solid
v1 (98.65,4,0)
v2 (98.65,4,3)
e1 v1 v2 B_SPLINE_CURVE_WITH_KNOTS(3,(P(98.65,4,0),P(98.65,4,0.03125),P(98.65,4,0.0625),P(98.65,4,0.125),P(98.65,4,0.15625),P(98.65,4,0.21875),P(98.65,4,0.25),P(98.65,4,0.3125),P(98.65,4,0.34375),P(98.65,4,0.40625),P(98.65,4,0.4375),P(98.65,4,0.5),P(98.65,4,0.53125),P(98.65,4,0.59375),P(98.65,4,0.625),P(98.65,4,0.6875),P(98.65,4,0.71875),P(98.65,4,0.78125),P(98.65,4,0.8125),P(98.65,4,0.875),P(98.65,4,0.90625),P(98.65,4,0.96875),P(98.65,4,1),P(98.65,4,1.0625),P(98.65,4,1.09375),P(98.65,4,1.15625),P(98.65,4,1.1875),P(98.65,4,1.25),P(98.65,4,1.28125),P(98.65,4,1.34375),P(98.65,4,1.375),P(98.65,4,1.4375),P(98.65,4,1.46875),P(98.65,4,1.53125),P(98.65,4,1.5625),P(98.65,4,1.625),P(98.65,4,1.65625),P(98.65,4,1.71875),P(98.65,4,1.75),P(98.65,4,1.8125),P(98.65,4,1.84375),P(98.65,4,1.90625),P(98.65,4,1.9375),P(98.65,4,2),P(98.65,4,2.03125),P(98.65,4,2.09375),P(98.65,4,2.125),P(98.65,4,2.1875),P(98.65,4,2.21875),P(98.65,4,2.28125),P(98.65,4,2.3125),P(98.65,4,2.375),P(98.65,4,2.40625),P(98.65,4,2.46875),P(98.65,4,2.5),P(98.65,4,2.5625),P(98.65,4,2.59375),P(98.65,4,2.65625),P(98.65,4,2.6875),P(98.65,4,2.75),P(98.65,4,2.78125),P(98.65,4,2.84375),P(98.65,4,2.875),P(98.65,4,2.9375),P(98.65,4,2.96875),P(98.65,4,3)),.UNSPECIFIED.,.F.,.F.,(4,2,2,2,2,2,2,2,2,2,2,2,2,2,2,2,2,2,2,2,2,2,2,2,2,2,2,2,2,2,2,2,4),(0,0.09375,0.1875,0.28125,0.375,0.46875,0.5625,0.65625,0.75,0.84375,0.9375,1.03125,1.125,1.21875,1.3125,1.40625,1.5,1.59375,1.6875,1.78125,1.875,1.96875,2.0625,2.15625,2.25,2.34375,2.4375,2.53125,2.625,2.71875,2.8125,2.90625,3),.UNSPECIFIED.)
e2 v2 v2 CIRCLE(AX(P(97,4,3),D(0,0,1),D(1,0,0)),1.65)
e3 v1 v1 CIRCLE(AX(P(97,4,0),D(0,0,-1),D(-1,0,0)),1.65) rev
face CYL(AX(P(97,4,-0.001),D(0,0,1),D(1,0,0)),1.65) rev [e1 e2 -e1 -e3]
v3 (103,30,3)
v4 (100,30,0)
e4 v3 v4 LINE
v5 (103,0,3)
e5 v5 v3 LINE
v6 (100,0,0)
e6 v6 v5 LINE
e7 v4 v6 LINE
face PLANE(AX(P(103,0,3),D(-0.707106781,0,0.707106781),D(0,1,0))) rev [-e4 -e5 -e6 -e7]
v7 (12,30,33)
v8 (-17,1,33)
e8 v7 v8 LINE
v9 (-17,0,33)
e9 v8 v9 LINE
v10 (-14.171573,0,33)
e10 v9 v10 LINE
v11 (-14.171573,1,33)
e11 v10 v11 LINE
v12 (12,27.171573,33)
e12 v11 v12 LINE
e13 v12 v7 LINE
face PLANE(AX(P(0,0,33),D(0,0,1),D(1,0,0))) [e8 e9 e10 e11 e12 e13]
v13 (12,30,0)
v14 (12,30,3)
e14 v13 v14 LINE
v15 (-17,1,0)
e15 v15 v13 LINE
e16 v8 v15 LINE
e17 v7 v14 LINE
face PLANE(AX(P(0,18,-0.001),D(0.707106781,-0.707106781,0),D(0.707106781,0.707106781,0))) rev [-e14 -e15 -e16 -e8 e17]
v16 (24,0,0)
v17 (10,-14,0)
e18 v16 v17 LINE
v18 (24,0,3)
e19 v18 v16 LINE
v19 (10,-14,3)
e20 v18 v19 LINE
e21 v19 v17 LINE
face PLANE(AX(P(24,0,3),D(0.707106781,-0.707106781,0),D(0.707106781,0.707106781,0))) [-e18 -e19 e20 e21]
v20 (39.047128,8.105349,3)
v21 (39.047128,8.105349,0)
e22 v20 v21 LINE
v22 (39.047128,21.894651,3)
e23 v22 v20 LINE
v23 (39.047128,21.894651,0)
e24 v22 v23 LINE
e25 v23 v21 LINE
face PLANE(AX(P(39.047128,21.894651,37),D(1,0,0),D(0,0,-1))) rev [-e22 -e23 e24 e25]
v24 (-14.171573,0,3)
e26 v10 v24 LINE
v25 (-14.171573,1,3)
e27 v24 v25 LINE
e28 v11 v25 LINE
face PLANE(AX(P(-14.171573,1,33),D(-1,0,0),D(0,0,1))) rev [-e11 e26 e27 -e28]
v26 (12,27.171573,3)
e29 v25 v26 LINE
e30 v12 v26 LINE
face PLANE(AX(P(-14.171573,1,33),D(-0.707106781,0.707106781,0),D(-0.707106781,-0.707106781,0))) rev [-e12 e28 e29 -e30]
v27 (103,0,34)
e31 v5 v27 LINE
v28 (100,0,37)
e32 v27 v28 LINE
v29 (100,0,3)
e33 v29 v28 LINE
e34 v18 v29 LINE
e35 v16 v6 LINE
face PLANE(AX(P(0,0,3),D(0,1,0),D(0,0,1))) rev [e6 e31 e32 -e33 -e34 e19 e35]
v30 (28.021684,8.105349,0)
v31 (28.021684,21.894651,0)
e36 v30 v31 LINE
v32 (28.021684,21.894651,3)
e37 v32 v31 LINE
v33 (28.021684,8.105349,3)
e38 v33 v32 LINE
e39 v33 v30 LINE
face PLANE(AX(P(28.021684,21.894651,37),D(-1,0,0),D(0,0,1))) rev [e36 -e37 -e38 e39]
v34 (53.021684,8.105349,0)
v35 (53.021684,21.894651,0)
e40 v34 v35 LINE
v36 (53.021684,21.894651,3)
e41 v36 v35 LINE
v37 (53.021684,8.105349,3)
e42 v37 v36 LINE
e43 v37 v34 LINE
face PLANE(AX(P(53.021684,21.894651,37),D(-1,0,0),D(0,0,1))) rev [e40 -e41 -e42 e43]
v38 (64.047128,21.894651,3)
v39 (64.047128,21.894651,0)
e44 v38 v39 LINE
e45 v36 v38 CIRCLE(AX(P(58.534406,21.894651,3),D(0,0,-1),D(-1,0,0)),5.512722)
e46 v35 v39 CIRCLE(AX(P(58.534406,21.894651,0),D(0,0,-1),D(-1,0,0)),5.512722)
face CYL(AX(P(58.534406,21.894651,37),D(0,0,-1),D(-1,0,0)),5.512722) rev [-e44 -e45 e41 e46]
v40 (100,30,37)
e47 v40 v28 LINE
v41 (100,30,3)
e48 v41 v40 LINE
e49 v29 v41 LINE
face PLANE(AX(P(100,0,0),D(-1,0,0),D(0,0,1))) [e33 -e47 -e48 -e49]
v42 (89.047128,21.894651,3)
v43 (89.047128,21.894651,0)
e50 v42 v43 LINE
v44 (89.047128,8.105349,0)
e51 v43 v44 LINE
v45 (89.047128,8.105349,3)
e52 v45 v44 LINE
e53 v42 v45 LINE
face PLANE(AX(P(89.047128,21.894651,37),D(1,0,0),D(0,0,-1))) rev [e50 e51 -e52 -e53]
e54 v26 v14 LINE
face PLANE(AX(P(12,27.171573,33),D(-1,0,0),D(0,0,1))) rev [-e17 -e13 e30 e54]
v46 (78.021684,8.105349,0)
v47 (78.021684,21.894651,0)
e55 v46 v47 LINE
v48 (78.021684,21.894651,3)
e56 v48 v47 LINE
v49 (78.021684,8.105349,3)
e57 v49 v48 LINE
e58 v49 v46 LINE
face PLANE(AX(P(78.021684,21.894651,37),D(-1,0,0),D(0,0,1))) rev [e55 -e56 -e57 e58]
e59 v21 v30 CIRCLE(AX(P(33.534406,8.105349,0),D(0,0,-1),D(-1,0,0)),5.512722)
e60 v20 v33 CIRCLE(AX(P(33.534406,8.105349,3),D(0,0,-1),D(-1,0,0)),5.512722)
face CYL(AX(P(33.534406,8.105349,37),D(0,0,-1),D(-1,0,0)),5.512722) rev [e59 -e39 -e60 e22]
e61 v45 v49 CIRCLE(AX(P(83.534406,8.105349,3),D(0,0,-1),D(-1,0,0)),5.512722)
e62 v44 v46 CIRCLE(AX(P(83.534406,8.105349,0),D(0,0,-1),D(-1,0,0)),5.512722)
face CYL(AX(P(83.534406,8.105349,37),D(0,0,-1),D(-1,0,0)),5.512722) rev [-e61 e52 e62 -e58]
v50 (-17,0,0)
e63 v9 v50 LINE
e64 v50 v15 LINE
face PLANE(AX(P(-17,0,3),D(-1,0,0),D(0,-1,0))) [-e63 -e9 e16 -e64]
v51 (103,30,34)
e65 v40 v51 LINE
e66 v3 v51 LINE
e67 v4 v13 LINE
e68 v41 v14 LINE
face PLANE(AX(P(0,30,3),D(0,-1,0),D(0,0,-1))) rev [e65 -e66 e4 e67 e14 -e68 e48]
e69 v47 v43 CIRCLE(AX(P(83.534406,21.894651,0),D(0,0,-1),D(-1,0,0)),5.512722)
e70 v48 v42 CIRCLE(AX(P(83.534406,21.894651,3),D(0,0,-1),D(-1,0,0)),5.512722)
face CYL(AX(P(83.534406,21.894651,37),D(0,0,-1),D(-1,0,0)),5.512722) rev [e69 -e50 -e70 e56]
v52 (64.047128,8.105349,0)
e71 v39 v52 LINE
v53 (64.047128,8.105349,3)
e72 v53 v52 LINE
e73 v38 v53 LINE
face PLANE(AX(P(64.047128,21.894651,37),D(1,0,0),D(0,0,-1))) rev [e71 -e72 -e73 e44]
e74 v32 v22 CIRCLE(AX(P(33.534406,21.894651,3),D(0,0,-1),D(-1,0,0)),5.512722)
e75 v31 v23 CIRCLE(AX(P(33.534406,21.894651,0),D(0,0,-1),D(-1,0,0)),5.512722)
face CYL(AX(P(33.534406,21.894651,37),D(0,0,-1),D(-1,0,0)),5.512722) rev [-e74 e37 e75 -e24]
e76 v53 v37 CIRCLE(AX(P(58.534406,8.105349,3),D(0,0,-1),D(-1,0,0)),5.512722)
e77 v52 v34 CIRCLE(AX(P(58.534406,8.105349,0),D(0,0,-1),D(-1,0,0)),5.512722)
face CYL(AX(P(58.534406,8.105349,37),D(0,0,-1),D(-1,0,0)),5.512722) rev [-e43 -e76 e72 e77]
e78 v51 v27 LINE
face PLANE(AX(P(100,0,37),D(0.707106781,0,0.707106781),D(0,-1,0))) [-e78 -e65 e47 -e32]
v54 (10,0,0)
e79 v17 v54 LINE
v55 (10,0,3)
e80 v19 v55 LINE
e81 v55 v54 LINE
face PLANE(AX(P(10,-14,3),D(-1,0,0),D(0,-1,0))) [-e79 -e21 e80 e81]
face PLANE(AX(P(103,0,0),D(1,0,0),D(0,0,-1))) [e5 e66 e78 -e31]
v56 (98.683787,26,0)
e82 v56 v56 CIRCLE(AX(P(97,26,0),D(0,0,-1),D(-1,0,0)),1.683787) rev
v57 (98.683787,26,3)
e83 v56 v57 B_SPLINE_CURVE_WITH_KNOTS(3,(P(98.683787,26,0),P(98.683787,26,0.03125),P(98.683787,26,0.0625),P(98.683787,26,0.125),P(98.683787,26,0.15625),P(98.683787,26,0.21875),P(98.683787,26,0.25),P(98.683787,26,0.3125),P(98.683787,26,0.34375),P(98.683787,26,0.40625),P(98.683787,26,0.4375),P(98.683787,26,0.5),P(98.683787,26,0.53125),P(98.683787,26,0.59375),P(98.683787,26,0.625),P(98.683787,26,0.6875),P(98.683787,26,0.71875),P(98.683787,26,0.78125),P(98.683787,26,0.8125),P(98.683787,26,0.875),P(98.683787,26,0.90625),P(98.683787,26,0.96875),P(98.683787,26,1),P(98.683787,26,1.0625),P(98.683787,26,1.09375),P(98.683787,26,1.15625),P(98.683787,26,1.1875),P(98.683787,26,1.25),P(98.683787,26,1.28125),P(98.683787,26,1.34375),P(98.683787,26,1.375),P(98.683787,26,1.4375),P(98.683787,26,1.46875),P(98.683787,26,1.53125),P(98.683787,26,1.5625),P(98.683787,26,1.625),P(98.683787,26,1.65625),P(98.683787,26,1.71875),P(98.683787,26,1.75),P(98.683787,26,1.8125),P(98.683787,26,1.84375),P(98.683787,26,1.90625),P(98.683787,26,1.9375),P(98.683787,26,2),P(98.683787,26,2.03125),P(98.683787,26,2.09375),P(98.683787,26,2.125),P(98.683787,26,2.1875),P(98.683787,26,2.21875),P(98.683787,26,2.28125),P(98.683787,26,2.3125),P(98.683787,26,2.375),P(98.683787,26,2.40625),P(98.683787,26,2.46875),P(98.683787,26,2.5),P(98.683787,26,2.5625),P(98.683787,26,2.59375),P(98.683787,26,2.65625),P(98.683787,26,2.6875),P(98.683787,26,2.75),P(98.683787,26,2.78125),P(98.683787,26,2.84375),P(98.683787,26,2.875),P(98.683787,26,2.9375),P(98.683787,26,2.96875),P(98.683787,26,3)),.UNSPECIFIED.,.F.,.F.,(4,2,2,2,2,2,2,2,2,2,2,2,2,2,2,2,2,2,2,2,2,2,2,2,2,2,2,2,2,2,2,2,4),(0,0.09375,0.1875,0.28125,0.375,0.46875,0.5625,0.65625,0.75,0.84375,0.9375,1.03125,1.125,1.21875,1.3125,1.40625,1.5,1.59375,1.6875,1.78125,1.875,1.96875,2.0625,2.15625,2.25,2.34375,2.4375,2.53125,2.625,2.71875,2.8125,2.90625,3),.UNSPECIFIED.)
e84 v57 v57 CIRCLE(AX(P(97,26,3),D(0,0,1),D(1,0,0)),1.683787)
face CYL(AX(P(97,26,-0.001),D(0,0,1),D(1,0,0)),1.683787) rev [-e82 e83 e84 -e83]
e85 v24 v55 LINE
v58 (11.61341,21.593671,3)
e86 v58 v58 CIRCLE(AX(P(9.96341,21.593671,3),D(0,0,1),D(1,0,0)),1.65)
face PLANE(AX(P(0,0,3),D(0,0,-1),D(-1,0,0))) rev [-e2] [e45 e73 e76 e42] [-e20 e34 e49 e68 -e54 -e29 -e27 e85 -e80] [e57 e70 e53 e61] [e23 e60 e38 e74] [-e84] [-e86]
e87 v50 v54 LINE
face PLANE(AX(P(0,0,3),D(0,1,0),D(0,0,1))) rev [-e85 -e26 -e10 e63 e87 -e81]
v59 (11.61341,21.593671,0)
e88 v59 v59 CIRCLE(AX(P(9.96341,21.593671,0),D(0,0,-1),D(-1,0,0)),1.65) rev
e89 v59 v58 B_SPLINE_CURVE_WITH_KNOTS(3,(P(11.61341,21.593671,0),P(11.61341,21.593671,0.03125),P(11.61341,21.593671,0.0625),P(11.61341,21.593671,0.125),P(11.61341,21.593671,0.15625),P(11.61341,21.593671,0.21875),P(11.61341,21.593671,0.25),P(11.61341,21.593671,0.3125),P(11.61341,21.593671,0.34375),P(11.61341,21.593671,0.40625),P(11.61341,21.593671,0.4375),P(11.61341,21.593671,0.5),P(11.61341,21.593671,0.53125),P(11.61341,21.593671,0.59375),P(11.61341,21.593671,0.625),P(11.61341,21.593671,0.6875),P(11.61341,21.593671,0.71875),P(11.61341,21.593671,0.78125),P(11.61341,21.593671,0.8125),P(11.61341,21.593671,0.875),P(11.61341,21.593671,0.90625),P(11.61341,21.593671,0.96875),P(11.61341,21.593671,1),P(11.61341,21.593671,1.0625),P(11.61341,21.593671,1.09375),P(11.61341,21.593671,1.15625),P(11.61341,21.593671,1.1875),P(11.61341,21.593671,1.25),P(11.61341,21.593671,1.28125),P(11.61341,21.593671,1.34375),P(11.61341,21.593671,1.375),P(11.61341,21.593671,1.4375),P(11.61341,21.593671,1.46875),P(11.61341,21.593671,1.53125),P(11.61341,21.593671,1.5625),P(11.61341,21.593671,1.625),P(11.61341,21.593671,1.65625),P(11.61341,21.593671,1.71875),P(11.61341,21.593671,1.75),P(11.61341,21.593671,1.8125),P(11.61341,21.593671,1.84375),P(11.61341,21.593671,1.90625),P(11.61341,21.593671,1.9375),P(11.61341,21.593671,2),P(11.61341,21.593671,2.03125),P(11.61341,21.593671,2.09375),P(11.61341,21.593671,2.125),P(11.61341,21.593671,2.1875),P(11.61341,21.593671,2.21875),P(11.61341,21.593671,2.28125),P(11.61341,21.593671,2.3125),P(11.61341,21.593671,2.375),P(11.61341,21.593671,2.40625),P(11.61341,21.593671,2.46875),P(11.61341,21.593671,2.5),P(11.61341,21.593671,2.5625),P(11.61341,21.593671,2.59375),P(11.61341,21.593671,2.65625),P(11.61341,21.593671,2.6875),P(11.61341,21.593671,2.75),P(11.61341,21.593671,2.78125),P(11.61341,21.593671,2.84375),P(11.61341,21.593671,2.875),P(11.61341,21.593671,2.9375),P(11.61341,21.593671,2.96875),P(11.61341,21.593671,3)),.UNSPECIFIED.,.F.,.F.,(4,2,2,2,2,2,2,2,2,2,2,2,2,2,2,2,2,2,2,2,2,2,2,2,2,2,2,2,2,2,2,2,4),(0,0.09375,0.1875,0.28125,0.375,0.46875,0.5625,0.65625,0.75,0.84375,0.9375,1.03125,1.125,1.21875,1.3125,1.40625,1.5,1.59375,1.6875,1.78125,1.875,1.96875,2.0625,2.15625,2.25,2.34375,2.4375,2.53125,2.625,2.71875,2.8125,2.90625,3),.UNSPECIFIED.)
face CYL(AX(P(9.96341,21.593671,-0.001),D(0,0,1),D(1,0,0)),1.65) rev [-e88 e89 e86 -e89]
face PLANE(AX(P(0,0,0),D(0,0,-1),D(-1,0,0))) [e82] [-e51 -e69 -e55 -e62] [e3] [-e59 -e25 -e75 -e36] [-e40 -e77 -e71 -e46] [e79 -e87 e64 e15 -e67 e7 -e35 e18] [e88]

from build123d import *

# Parameters (mm, degrees)
SKETCH_1_W           = 100
SKETCH_1_H           = 30
EXTRUDE_1_DEPTH      = 3
CUT_EXTRUDE_1_REACH  = 106.446
EXTRUDE_3_DEPTH      = 3
CUT_EXTRUDE_2_REACH  = 106.446
SKETCH_5_R           = 1.65
SKETCH_5_R_2         = 1.683787266
EXTRUDE_4_DEPTH      = 34
EXTRUDE_4_DEPTH_BACK = 3
SKETCH_6_W           = 3
SKETCH_6_H           = 30
EXTRUDE_5_DEPTH      = 30
CHAMFER_1_SIZE       = 3
CHAMFER_2_SIZE       = 3
EXTRUDE_6_DEPTH      = 3
CUT_EXTRUDE_3_DEPTH  = 114.481275989


with BuildPart() as part:
    # 草图1 → 凸台-拉伸1 (new body)
    with BuildSketch(Plane.XY):
        with Locations((50, 15)):
            Rectangle(SKETCH_1_W, SKETCH_1_H)
    extrude(amount=EXTRUDE_1_DEPTH)

    # 草图2 → 切除-拉伸1 (cut, up to next)
    with BuildSketch(Plane.XY.offset(3), mode=Mode.PRIVATE) as cut_extrude_1_sk1:
        Polygon((0, 18), (12, 30), (0, 30), align=None)
    cut_extrude_1_tool1 = extrude(cut_extrude_1_sk1.sketch, amount=-CUT_EXTRUDE_1_REACH, mode=Mode.PRIVATE) & part.part
    add(cut_extrude_1_tool1.solids().sort_by_distance((4, 26, 3))[0], mode=Mode.SUBTRACT)

    # 草图4 → 凸台-拉伸3 (add)
    with BuildSketch(Plane(origin=(0, 0, 0), x_dir=(-1, 0, 0), z_dir=(0, 0, -1))):
        Polygon((0, 0), (17, 0), (17, 1), (0, 18), align=None)
    extrude(amount=-EXTRUDE_3_DEPTH)

    # 草图5 → 切除-拉伸2 (cut, up to next)
    with BuildSketch(Plane.XY.offset(3), mode=Mode.PRIVATE) as cut_extrude_2_sk1:
        with Locations((9.963410089, 21.593670707)):
            Circle(SKETCH_5_R)
    cut_extrude_2_tool1 = extrude(cut_extrude_2_sk1.sketch, amount=-CUT_EXTRUDE_2_REACH, mode=Mode.PRIVATE) & part.part
    # 草图5 → 切除-拉伸2 (cut, up to next)
    with BuildSketch(Plane.XY.offset(3), mode=Mode.PRIVATE) as cut_extrude_2_sk2:
        with Locations((97, 26)):
            Circle(SKETCH_5_R_2)
    cut_extrude_2_tool2 = extrude(cut_extrude_2_sk2.sketch, amount=-CUT_EXTRUDE_2_REACH, mode=Mode.PRIVATE) & part.part
    # 草图5 → 切除-拉伸2 (cut, up to next)
    with BuildSketch(Plane.XY.offset(3), mode=Mode.PRIVATE) as cut_extrude_2_sk3:
        with Locations((97, 4)):
            Circle(SKETCH_5_R)
    cut_extrude_2_tool3 = extrude(cut_extrude_2_sk3.sketch, amount=-CUT_EXTRUDE_2_REACH, mode=Mode.PRIVATE) & part.part
    add(cut_extrude_2_tool1.solids().sort_by_distance((9.96341, 21.593671, 3))[0], mode=Mode.SUBTRACT)
    add(cut_extrude_2_tool2.solids().sort_by_distance((97, 26, 3))[0], mode=Mode.SUBTRACT)
    add(cut_extrude_2_tool3.solids().sort_by_distance((97, 4, 3))[0], mode=Mode.SUBTRACT)

    # 草图6 → 凸台-拉伸4 (add, two sides: drawn at the far end of the back side and taken through both)
    with BuildSketch(Plane.XY.offset(3).offset(-EXTRUDE_4_DEPTH_BACK)):
        with Locations((101.5, 15)):
            Rectangle(SKETCH_6_W, SKETCH_6_H)
    extrude(amount=EXTRUDE_4_DEPTH + EXTRUDE_4_DEPTH_BACK)

    # 草图7 → 凸台-拉伸5 (add)
    with BuildSketch(Plane.XY.offset(3)):
        Polygon((-17, 1), (12, 30), (12, 27.171572875), (-14.171572875, 1), (-14.171572875, 0), (-17, 0), align=None)
    extrude(amount=EXTRUDE_5_DEPTH)

    # 倒角1
    chamfer_1_edges = [part.edges().sort_by_distance(p)[0] for p in [
        (103, 15, 0),
    ]]
    chamfer(chamfer_1_edges, length=CHAMFER_1_SIZE)

    # 倒角2
    chamfer_2_edges = [part.edges().sort_by_distance(p)[0] for p in [
        (103, 15, 37),
    ]]
    chamfer(chamfer_2_edges, length=CHAMFER_2_SIZE - 0.0001)  # a hair under: the kernel refuses the full size

    # 草图3 → 凸台-拉伸6 (add)
    with BuildSketch(Plane(origin=(0, 0, 0), x_dir=(-1, 0, 0), z_dir=(0, 0, -1))):
        Polygon((-24, 0), (-10, -14), (-10, 0), align=None)
    extrude(amount=-EXTRUDE_6_DEPTH)

    # 草图8 → 切除-拉伸3 (cut, through all)
    with BuildSketch(Plane(origin=(0, 0, 0), x_dir=(-1, 0, 0), z_dir=(0, 0, -1))):
        with BuildLine():
            Line((-78.021683781, 21.894650921), (-78.021683781, 8.105349079))
            ThreePointArc((-78.021683781, 8.105349079), (-83.534405897, 2.592626964), (-89.047128012, 8.105349079))
            Line((-89.047128012, 8.105349079), (-89.047128012, 21.894650921))
            ThreePointArc((-89.047128012, 21.894650921), (-83.534405897, 27.407373036), (-78.021683781, 21.894650921))
        make_face()
        with BuildLine():
            Line((-53.021683781, 21.894650921), (-53.021683781, 8.105349079))
            ThreePointArc((-53.021683781, 8.105349079), (-58.534405897, 2.592626964), (-64.047128012, 8.105349079))
            Line((-64.047128012, 8.105349079), (-64.047128012, 21.894650921))
            ThreePointArc((-64.047128012, 21.894650921), (-58.534405897, 27.407373036), (-53.021683781, 21.894650921))
        make_face()
        with BuildLine():
            Line((-28.021683781, 21.894650921), (-28.021683781, 8.105349079))
            ThreePointArc((-28.021683781, 8.105349079), (-33.534405897, 2.592626964), (-39.047128012, 8.105349079))
            Line((-39.047128012, 8.105349079), (-39.047128012, 21.894650921))
            ThreePointArc((-39.047128012, 21.894650921), (-33.534405897, 27.407373036), (-28.021683781, 21.894650921))
        make_face()
    extrude(amount=-CUT_EXTRUDE_3_DEPTH, mode=Mode.SUBTRACT)


solid = part.part
